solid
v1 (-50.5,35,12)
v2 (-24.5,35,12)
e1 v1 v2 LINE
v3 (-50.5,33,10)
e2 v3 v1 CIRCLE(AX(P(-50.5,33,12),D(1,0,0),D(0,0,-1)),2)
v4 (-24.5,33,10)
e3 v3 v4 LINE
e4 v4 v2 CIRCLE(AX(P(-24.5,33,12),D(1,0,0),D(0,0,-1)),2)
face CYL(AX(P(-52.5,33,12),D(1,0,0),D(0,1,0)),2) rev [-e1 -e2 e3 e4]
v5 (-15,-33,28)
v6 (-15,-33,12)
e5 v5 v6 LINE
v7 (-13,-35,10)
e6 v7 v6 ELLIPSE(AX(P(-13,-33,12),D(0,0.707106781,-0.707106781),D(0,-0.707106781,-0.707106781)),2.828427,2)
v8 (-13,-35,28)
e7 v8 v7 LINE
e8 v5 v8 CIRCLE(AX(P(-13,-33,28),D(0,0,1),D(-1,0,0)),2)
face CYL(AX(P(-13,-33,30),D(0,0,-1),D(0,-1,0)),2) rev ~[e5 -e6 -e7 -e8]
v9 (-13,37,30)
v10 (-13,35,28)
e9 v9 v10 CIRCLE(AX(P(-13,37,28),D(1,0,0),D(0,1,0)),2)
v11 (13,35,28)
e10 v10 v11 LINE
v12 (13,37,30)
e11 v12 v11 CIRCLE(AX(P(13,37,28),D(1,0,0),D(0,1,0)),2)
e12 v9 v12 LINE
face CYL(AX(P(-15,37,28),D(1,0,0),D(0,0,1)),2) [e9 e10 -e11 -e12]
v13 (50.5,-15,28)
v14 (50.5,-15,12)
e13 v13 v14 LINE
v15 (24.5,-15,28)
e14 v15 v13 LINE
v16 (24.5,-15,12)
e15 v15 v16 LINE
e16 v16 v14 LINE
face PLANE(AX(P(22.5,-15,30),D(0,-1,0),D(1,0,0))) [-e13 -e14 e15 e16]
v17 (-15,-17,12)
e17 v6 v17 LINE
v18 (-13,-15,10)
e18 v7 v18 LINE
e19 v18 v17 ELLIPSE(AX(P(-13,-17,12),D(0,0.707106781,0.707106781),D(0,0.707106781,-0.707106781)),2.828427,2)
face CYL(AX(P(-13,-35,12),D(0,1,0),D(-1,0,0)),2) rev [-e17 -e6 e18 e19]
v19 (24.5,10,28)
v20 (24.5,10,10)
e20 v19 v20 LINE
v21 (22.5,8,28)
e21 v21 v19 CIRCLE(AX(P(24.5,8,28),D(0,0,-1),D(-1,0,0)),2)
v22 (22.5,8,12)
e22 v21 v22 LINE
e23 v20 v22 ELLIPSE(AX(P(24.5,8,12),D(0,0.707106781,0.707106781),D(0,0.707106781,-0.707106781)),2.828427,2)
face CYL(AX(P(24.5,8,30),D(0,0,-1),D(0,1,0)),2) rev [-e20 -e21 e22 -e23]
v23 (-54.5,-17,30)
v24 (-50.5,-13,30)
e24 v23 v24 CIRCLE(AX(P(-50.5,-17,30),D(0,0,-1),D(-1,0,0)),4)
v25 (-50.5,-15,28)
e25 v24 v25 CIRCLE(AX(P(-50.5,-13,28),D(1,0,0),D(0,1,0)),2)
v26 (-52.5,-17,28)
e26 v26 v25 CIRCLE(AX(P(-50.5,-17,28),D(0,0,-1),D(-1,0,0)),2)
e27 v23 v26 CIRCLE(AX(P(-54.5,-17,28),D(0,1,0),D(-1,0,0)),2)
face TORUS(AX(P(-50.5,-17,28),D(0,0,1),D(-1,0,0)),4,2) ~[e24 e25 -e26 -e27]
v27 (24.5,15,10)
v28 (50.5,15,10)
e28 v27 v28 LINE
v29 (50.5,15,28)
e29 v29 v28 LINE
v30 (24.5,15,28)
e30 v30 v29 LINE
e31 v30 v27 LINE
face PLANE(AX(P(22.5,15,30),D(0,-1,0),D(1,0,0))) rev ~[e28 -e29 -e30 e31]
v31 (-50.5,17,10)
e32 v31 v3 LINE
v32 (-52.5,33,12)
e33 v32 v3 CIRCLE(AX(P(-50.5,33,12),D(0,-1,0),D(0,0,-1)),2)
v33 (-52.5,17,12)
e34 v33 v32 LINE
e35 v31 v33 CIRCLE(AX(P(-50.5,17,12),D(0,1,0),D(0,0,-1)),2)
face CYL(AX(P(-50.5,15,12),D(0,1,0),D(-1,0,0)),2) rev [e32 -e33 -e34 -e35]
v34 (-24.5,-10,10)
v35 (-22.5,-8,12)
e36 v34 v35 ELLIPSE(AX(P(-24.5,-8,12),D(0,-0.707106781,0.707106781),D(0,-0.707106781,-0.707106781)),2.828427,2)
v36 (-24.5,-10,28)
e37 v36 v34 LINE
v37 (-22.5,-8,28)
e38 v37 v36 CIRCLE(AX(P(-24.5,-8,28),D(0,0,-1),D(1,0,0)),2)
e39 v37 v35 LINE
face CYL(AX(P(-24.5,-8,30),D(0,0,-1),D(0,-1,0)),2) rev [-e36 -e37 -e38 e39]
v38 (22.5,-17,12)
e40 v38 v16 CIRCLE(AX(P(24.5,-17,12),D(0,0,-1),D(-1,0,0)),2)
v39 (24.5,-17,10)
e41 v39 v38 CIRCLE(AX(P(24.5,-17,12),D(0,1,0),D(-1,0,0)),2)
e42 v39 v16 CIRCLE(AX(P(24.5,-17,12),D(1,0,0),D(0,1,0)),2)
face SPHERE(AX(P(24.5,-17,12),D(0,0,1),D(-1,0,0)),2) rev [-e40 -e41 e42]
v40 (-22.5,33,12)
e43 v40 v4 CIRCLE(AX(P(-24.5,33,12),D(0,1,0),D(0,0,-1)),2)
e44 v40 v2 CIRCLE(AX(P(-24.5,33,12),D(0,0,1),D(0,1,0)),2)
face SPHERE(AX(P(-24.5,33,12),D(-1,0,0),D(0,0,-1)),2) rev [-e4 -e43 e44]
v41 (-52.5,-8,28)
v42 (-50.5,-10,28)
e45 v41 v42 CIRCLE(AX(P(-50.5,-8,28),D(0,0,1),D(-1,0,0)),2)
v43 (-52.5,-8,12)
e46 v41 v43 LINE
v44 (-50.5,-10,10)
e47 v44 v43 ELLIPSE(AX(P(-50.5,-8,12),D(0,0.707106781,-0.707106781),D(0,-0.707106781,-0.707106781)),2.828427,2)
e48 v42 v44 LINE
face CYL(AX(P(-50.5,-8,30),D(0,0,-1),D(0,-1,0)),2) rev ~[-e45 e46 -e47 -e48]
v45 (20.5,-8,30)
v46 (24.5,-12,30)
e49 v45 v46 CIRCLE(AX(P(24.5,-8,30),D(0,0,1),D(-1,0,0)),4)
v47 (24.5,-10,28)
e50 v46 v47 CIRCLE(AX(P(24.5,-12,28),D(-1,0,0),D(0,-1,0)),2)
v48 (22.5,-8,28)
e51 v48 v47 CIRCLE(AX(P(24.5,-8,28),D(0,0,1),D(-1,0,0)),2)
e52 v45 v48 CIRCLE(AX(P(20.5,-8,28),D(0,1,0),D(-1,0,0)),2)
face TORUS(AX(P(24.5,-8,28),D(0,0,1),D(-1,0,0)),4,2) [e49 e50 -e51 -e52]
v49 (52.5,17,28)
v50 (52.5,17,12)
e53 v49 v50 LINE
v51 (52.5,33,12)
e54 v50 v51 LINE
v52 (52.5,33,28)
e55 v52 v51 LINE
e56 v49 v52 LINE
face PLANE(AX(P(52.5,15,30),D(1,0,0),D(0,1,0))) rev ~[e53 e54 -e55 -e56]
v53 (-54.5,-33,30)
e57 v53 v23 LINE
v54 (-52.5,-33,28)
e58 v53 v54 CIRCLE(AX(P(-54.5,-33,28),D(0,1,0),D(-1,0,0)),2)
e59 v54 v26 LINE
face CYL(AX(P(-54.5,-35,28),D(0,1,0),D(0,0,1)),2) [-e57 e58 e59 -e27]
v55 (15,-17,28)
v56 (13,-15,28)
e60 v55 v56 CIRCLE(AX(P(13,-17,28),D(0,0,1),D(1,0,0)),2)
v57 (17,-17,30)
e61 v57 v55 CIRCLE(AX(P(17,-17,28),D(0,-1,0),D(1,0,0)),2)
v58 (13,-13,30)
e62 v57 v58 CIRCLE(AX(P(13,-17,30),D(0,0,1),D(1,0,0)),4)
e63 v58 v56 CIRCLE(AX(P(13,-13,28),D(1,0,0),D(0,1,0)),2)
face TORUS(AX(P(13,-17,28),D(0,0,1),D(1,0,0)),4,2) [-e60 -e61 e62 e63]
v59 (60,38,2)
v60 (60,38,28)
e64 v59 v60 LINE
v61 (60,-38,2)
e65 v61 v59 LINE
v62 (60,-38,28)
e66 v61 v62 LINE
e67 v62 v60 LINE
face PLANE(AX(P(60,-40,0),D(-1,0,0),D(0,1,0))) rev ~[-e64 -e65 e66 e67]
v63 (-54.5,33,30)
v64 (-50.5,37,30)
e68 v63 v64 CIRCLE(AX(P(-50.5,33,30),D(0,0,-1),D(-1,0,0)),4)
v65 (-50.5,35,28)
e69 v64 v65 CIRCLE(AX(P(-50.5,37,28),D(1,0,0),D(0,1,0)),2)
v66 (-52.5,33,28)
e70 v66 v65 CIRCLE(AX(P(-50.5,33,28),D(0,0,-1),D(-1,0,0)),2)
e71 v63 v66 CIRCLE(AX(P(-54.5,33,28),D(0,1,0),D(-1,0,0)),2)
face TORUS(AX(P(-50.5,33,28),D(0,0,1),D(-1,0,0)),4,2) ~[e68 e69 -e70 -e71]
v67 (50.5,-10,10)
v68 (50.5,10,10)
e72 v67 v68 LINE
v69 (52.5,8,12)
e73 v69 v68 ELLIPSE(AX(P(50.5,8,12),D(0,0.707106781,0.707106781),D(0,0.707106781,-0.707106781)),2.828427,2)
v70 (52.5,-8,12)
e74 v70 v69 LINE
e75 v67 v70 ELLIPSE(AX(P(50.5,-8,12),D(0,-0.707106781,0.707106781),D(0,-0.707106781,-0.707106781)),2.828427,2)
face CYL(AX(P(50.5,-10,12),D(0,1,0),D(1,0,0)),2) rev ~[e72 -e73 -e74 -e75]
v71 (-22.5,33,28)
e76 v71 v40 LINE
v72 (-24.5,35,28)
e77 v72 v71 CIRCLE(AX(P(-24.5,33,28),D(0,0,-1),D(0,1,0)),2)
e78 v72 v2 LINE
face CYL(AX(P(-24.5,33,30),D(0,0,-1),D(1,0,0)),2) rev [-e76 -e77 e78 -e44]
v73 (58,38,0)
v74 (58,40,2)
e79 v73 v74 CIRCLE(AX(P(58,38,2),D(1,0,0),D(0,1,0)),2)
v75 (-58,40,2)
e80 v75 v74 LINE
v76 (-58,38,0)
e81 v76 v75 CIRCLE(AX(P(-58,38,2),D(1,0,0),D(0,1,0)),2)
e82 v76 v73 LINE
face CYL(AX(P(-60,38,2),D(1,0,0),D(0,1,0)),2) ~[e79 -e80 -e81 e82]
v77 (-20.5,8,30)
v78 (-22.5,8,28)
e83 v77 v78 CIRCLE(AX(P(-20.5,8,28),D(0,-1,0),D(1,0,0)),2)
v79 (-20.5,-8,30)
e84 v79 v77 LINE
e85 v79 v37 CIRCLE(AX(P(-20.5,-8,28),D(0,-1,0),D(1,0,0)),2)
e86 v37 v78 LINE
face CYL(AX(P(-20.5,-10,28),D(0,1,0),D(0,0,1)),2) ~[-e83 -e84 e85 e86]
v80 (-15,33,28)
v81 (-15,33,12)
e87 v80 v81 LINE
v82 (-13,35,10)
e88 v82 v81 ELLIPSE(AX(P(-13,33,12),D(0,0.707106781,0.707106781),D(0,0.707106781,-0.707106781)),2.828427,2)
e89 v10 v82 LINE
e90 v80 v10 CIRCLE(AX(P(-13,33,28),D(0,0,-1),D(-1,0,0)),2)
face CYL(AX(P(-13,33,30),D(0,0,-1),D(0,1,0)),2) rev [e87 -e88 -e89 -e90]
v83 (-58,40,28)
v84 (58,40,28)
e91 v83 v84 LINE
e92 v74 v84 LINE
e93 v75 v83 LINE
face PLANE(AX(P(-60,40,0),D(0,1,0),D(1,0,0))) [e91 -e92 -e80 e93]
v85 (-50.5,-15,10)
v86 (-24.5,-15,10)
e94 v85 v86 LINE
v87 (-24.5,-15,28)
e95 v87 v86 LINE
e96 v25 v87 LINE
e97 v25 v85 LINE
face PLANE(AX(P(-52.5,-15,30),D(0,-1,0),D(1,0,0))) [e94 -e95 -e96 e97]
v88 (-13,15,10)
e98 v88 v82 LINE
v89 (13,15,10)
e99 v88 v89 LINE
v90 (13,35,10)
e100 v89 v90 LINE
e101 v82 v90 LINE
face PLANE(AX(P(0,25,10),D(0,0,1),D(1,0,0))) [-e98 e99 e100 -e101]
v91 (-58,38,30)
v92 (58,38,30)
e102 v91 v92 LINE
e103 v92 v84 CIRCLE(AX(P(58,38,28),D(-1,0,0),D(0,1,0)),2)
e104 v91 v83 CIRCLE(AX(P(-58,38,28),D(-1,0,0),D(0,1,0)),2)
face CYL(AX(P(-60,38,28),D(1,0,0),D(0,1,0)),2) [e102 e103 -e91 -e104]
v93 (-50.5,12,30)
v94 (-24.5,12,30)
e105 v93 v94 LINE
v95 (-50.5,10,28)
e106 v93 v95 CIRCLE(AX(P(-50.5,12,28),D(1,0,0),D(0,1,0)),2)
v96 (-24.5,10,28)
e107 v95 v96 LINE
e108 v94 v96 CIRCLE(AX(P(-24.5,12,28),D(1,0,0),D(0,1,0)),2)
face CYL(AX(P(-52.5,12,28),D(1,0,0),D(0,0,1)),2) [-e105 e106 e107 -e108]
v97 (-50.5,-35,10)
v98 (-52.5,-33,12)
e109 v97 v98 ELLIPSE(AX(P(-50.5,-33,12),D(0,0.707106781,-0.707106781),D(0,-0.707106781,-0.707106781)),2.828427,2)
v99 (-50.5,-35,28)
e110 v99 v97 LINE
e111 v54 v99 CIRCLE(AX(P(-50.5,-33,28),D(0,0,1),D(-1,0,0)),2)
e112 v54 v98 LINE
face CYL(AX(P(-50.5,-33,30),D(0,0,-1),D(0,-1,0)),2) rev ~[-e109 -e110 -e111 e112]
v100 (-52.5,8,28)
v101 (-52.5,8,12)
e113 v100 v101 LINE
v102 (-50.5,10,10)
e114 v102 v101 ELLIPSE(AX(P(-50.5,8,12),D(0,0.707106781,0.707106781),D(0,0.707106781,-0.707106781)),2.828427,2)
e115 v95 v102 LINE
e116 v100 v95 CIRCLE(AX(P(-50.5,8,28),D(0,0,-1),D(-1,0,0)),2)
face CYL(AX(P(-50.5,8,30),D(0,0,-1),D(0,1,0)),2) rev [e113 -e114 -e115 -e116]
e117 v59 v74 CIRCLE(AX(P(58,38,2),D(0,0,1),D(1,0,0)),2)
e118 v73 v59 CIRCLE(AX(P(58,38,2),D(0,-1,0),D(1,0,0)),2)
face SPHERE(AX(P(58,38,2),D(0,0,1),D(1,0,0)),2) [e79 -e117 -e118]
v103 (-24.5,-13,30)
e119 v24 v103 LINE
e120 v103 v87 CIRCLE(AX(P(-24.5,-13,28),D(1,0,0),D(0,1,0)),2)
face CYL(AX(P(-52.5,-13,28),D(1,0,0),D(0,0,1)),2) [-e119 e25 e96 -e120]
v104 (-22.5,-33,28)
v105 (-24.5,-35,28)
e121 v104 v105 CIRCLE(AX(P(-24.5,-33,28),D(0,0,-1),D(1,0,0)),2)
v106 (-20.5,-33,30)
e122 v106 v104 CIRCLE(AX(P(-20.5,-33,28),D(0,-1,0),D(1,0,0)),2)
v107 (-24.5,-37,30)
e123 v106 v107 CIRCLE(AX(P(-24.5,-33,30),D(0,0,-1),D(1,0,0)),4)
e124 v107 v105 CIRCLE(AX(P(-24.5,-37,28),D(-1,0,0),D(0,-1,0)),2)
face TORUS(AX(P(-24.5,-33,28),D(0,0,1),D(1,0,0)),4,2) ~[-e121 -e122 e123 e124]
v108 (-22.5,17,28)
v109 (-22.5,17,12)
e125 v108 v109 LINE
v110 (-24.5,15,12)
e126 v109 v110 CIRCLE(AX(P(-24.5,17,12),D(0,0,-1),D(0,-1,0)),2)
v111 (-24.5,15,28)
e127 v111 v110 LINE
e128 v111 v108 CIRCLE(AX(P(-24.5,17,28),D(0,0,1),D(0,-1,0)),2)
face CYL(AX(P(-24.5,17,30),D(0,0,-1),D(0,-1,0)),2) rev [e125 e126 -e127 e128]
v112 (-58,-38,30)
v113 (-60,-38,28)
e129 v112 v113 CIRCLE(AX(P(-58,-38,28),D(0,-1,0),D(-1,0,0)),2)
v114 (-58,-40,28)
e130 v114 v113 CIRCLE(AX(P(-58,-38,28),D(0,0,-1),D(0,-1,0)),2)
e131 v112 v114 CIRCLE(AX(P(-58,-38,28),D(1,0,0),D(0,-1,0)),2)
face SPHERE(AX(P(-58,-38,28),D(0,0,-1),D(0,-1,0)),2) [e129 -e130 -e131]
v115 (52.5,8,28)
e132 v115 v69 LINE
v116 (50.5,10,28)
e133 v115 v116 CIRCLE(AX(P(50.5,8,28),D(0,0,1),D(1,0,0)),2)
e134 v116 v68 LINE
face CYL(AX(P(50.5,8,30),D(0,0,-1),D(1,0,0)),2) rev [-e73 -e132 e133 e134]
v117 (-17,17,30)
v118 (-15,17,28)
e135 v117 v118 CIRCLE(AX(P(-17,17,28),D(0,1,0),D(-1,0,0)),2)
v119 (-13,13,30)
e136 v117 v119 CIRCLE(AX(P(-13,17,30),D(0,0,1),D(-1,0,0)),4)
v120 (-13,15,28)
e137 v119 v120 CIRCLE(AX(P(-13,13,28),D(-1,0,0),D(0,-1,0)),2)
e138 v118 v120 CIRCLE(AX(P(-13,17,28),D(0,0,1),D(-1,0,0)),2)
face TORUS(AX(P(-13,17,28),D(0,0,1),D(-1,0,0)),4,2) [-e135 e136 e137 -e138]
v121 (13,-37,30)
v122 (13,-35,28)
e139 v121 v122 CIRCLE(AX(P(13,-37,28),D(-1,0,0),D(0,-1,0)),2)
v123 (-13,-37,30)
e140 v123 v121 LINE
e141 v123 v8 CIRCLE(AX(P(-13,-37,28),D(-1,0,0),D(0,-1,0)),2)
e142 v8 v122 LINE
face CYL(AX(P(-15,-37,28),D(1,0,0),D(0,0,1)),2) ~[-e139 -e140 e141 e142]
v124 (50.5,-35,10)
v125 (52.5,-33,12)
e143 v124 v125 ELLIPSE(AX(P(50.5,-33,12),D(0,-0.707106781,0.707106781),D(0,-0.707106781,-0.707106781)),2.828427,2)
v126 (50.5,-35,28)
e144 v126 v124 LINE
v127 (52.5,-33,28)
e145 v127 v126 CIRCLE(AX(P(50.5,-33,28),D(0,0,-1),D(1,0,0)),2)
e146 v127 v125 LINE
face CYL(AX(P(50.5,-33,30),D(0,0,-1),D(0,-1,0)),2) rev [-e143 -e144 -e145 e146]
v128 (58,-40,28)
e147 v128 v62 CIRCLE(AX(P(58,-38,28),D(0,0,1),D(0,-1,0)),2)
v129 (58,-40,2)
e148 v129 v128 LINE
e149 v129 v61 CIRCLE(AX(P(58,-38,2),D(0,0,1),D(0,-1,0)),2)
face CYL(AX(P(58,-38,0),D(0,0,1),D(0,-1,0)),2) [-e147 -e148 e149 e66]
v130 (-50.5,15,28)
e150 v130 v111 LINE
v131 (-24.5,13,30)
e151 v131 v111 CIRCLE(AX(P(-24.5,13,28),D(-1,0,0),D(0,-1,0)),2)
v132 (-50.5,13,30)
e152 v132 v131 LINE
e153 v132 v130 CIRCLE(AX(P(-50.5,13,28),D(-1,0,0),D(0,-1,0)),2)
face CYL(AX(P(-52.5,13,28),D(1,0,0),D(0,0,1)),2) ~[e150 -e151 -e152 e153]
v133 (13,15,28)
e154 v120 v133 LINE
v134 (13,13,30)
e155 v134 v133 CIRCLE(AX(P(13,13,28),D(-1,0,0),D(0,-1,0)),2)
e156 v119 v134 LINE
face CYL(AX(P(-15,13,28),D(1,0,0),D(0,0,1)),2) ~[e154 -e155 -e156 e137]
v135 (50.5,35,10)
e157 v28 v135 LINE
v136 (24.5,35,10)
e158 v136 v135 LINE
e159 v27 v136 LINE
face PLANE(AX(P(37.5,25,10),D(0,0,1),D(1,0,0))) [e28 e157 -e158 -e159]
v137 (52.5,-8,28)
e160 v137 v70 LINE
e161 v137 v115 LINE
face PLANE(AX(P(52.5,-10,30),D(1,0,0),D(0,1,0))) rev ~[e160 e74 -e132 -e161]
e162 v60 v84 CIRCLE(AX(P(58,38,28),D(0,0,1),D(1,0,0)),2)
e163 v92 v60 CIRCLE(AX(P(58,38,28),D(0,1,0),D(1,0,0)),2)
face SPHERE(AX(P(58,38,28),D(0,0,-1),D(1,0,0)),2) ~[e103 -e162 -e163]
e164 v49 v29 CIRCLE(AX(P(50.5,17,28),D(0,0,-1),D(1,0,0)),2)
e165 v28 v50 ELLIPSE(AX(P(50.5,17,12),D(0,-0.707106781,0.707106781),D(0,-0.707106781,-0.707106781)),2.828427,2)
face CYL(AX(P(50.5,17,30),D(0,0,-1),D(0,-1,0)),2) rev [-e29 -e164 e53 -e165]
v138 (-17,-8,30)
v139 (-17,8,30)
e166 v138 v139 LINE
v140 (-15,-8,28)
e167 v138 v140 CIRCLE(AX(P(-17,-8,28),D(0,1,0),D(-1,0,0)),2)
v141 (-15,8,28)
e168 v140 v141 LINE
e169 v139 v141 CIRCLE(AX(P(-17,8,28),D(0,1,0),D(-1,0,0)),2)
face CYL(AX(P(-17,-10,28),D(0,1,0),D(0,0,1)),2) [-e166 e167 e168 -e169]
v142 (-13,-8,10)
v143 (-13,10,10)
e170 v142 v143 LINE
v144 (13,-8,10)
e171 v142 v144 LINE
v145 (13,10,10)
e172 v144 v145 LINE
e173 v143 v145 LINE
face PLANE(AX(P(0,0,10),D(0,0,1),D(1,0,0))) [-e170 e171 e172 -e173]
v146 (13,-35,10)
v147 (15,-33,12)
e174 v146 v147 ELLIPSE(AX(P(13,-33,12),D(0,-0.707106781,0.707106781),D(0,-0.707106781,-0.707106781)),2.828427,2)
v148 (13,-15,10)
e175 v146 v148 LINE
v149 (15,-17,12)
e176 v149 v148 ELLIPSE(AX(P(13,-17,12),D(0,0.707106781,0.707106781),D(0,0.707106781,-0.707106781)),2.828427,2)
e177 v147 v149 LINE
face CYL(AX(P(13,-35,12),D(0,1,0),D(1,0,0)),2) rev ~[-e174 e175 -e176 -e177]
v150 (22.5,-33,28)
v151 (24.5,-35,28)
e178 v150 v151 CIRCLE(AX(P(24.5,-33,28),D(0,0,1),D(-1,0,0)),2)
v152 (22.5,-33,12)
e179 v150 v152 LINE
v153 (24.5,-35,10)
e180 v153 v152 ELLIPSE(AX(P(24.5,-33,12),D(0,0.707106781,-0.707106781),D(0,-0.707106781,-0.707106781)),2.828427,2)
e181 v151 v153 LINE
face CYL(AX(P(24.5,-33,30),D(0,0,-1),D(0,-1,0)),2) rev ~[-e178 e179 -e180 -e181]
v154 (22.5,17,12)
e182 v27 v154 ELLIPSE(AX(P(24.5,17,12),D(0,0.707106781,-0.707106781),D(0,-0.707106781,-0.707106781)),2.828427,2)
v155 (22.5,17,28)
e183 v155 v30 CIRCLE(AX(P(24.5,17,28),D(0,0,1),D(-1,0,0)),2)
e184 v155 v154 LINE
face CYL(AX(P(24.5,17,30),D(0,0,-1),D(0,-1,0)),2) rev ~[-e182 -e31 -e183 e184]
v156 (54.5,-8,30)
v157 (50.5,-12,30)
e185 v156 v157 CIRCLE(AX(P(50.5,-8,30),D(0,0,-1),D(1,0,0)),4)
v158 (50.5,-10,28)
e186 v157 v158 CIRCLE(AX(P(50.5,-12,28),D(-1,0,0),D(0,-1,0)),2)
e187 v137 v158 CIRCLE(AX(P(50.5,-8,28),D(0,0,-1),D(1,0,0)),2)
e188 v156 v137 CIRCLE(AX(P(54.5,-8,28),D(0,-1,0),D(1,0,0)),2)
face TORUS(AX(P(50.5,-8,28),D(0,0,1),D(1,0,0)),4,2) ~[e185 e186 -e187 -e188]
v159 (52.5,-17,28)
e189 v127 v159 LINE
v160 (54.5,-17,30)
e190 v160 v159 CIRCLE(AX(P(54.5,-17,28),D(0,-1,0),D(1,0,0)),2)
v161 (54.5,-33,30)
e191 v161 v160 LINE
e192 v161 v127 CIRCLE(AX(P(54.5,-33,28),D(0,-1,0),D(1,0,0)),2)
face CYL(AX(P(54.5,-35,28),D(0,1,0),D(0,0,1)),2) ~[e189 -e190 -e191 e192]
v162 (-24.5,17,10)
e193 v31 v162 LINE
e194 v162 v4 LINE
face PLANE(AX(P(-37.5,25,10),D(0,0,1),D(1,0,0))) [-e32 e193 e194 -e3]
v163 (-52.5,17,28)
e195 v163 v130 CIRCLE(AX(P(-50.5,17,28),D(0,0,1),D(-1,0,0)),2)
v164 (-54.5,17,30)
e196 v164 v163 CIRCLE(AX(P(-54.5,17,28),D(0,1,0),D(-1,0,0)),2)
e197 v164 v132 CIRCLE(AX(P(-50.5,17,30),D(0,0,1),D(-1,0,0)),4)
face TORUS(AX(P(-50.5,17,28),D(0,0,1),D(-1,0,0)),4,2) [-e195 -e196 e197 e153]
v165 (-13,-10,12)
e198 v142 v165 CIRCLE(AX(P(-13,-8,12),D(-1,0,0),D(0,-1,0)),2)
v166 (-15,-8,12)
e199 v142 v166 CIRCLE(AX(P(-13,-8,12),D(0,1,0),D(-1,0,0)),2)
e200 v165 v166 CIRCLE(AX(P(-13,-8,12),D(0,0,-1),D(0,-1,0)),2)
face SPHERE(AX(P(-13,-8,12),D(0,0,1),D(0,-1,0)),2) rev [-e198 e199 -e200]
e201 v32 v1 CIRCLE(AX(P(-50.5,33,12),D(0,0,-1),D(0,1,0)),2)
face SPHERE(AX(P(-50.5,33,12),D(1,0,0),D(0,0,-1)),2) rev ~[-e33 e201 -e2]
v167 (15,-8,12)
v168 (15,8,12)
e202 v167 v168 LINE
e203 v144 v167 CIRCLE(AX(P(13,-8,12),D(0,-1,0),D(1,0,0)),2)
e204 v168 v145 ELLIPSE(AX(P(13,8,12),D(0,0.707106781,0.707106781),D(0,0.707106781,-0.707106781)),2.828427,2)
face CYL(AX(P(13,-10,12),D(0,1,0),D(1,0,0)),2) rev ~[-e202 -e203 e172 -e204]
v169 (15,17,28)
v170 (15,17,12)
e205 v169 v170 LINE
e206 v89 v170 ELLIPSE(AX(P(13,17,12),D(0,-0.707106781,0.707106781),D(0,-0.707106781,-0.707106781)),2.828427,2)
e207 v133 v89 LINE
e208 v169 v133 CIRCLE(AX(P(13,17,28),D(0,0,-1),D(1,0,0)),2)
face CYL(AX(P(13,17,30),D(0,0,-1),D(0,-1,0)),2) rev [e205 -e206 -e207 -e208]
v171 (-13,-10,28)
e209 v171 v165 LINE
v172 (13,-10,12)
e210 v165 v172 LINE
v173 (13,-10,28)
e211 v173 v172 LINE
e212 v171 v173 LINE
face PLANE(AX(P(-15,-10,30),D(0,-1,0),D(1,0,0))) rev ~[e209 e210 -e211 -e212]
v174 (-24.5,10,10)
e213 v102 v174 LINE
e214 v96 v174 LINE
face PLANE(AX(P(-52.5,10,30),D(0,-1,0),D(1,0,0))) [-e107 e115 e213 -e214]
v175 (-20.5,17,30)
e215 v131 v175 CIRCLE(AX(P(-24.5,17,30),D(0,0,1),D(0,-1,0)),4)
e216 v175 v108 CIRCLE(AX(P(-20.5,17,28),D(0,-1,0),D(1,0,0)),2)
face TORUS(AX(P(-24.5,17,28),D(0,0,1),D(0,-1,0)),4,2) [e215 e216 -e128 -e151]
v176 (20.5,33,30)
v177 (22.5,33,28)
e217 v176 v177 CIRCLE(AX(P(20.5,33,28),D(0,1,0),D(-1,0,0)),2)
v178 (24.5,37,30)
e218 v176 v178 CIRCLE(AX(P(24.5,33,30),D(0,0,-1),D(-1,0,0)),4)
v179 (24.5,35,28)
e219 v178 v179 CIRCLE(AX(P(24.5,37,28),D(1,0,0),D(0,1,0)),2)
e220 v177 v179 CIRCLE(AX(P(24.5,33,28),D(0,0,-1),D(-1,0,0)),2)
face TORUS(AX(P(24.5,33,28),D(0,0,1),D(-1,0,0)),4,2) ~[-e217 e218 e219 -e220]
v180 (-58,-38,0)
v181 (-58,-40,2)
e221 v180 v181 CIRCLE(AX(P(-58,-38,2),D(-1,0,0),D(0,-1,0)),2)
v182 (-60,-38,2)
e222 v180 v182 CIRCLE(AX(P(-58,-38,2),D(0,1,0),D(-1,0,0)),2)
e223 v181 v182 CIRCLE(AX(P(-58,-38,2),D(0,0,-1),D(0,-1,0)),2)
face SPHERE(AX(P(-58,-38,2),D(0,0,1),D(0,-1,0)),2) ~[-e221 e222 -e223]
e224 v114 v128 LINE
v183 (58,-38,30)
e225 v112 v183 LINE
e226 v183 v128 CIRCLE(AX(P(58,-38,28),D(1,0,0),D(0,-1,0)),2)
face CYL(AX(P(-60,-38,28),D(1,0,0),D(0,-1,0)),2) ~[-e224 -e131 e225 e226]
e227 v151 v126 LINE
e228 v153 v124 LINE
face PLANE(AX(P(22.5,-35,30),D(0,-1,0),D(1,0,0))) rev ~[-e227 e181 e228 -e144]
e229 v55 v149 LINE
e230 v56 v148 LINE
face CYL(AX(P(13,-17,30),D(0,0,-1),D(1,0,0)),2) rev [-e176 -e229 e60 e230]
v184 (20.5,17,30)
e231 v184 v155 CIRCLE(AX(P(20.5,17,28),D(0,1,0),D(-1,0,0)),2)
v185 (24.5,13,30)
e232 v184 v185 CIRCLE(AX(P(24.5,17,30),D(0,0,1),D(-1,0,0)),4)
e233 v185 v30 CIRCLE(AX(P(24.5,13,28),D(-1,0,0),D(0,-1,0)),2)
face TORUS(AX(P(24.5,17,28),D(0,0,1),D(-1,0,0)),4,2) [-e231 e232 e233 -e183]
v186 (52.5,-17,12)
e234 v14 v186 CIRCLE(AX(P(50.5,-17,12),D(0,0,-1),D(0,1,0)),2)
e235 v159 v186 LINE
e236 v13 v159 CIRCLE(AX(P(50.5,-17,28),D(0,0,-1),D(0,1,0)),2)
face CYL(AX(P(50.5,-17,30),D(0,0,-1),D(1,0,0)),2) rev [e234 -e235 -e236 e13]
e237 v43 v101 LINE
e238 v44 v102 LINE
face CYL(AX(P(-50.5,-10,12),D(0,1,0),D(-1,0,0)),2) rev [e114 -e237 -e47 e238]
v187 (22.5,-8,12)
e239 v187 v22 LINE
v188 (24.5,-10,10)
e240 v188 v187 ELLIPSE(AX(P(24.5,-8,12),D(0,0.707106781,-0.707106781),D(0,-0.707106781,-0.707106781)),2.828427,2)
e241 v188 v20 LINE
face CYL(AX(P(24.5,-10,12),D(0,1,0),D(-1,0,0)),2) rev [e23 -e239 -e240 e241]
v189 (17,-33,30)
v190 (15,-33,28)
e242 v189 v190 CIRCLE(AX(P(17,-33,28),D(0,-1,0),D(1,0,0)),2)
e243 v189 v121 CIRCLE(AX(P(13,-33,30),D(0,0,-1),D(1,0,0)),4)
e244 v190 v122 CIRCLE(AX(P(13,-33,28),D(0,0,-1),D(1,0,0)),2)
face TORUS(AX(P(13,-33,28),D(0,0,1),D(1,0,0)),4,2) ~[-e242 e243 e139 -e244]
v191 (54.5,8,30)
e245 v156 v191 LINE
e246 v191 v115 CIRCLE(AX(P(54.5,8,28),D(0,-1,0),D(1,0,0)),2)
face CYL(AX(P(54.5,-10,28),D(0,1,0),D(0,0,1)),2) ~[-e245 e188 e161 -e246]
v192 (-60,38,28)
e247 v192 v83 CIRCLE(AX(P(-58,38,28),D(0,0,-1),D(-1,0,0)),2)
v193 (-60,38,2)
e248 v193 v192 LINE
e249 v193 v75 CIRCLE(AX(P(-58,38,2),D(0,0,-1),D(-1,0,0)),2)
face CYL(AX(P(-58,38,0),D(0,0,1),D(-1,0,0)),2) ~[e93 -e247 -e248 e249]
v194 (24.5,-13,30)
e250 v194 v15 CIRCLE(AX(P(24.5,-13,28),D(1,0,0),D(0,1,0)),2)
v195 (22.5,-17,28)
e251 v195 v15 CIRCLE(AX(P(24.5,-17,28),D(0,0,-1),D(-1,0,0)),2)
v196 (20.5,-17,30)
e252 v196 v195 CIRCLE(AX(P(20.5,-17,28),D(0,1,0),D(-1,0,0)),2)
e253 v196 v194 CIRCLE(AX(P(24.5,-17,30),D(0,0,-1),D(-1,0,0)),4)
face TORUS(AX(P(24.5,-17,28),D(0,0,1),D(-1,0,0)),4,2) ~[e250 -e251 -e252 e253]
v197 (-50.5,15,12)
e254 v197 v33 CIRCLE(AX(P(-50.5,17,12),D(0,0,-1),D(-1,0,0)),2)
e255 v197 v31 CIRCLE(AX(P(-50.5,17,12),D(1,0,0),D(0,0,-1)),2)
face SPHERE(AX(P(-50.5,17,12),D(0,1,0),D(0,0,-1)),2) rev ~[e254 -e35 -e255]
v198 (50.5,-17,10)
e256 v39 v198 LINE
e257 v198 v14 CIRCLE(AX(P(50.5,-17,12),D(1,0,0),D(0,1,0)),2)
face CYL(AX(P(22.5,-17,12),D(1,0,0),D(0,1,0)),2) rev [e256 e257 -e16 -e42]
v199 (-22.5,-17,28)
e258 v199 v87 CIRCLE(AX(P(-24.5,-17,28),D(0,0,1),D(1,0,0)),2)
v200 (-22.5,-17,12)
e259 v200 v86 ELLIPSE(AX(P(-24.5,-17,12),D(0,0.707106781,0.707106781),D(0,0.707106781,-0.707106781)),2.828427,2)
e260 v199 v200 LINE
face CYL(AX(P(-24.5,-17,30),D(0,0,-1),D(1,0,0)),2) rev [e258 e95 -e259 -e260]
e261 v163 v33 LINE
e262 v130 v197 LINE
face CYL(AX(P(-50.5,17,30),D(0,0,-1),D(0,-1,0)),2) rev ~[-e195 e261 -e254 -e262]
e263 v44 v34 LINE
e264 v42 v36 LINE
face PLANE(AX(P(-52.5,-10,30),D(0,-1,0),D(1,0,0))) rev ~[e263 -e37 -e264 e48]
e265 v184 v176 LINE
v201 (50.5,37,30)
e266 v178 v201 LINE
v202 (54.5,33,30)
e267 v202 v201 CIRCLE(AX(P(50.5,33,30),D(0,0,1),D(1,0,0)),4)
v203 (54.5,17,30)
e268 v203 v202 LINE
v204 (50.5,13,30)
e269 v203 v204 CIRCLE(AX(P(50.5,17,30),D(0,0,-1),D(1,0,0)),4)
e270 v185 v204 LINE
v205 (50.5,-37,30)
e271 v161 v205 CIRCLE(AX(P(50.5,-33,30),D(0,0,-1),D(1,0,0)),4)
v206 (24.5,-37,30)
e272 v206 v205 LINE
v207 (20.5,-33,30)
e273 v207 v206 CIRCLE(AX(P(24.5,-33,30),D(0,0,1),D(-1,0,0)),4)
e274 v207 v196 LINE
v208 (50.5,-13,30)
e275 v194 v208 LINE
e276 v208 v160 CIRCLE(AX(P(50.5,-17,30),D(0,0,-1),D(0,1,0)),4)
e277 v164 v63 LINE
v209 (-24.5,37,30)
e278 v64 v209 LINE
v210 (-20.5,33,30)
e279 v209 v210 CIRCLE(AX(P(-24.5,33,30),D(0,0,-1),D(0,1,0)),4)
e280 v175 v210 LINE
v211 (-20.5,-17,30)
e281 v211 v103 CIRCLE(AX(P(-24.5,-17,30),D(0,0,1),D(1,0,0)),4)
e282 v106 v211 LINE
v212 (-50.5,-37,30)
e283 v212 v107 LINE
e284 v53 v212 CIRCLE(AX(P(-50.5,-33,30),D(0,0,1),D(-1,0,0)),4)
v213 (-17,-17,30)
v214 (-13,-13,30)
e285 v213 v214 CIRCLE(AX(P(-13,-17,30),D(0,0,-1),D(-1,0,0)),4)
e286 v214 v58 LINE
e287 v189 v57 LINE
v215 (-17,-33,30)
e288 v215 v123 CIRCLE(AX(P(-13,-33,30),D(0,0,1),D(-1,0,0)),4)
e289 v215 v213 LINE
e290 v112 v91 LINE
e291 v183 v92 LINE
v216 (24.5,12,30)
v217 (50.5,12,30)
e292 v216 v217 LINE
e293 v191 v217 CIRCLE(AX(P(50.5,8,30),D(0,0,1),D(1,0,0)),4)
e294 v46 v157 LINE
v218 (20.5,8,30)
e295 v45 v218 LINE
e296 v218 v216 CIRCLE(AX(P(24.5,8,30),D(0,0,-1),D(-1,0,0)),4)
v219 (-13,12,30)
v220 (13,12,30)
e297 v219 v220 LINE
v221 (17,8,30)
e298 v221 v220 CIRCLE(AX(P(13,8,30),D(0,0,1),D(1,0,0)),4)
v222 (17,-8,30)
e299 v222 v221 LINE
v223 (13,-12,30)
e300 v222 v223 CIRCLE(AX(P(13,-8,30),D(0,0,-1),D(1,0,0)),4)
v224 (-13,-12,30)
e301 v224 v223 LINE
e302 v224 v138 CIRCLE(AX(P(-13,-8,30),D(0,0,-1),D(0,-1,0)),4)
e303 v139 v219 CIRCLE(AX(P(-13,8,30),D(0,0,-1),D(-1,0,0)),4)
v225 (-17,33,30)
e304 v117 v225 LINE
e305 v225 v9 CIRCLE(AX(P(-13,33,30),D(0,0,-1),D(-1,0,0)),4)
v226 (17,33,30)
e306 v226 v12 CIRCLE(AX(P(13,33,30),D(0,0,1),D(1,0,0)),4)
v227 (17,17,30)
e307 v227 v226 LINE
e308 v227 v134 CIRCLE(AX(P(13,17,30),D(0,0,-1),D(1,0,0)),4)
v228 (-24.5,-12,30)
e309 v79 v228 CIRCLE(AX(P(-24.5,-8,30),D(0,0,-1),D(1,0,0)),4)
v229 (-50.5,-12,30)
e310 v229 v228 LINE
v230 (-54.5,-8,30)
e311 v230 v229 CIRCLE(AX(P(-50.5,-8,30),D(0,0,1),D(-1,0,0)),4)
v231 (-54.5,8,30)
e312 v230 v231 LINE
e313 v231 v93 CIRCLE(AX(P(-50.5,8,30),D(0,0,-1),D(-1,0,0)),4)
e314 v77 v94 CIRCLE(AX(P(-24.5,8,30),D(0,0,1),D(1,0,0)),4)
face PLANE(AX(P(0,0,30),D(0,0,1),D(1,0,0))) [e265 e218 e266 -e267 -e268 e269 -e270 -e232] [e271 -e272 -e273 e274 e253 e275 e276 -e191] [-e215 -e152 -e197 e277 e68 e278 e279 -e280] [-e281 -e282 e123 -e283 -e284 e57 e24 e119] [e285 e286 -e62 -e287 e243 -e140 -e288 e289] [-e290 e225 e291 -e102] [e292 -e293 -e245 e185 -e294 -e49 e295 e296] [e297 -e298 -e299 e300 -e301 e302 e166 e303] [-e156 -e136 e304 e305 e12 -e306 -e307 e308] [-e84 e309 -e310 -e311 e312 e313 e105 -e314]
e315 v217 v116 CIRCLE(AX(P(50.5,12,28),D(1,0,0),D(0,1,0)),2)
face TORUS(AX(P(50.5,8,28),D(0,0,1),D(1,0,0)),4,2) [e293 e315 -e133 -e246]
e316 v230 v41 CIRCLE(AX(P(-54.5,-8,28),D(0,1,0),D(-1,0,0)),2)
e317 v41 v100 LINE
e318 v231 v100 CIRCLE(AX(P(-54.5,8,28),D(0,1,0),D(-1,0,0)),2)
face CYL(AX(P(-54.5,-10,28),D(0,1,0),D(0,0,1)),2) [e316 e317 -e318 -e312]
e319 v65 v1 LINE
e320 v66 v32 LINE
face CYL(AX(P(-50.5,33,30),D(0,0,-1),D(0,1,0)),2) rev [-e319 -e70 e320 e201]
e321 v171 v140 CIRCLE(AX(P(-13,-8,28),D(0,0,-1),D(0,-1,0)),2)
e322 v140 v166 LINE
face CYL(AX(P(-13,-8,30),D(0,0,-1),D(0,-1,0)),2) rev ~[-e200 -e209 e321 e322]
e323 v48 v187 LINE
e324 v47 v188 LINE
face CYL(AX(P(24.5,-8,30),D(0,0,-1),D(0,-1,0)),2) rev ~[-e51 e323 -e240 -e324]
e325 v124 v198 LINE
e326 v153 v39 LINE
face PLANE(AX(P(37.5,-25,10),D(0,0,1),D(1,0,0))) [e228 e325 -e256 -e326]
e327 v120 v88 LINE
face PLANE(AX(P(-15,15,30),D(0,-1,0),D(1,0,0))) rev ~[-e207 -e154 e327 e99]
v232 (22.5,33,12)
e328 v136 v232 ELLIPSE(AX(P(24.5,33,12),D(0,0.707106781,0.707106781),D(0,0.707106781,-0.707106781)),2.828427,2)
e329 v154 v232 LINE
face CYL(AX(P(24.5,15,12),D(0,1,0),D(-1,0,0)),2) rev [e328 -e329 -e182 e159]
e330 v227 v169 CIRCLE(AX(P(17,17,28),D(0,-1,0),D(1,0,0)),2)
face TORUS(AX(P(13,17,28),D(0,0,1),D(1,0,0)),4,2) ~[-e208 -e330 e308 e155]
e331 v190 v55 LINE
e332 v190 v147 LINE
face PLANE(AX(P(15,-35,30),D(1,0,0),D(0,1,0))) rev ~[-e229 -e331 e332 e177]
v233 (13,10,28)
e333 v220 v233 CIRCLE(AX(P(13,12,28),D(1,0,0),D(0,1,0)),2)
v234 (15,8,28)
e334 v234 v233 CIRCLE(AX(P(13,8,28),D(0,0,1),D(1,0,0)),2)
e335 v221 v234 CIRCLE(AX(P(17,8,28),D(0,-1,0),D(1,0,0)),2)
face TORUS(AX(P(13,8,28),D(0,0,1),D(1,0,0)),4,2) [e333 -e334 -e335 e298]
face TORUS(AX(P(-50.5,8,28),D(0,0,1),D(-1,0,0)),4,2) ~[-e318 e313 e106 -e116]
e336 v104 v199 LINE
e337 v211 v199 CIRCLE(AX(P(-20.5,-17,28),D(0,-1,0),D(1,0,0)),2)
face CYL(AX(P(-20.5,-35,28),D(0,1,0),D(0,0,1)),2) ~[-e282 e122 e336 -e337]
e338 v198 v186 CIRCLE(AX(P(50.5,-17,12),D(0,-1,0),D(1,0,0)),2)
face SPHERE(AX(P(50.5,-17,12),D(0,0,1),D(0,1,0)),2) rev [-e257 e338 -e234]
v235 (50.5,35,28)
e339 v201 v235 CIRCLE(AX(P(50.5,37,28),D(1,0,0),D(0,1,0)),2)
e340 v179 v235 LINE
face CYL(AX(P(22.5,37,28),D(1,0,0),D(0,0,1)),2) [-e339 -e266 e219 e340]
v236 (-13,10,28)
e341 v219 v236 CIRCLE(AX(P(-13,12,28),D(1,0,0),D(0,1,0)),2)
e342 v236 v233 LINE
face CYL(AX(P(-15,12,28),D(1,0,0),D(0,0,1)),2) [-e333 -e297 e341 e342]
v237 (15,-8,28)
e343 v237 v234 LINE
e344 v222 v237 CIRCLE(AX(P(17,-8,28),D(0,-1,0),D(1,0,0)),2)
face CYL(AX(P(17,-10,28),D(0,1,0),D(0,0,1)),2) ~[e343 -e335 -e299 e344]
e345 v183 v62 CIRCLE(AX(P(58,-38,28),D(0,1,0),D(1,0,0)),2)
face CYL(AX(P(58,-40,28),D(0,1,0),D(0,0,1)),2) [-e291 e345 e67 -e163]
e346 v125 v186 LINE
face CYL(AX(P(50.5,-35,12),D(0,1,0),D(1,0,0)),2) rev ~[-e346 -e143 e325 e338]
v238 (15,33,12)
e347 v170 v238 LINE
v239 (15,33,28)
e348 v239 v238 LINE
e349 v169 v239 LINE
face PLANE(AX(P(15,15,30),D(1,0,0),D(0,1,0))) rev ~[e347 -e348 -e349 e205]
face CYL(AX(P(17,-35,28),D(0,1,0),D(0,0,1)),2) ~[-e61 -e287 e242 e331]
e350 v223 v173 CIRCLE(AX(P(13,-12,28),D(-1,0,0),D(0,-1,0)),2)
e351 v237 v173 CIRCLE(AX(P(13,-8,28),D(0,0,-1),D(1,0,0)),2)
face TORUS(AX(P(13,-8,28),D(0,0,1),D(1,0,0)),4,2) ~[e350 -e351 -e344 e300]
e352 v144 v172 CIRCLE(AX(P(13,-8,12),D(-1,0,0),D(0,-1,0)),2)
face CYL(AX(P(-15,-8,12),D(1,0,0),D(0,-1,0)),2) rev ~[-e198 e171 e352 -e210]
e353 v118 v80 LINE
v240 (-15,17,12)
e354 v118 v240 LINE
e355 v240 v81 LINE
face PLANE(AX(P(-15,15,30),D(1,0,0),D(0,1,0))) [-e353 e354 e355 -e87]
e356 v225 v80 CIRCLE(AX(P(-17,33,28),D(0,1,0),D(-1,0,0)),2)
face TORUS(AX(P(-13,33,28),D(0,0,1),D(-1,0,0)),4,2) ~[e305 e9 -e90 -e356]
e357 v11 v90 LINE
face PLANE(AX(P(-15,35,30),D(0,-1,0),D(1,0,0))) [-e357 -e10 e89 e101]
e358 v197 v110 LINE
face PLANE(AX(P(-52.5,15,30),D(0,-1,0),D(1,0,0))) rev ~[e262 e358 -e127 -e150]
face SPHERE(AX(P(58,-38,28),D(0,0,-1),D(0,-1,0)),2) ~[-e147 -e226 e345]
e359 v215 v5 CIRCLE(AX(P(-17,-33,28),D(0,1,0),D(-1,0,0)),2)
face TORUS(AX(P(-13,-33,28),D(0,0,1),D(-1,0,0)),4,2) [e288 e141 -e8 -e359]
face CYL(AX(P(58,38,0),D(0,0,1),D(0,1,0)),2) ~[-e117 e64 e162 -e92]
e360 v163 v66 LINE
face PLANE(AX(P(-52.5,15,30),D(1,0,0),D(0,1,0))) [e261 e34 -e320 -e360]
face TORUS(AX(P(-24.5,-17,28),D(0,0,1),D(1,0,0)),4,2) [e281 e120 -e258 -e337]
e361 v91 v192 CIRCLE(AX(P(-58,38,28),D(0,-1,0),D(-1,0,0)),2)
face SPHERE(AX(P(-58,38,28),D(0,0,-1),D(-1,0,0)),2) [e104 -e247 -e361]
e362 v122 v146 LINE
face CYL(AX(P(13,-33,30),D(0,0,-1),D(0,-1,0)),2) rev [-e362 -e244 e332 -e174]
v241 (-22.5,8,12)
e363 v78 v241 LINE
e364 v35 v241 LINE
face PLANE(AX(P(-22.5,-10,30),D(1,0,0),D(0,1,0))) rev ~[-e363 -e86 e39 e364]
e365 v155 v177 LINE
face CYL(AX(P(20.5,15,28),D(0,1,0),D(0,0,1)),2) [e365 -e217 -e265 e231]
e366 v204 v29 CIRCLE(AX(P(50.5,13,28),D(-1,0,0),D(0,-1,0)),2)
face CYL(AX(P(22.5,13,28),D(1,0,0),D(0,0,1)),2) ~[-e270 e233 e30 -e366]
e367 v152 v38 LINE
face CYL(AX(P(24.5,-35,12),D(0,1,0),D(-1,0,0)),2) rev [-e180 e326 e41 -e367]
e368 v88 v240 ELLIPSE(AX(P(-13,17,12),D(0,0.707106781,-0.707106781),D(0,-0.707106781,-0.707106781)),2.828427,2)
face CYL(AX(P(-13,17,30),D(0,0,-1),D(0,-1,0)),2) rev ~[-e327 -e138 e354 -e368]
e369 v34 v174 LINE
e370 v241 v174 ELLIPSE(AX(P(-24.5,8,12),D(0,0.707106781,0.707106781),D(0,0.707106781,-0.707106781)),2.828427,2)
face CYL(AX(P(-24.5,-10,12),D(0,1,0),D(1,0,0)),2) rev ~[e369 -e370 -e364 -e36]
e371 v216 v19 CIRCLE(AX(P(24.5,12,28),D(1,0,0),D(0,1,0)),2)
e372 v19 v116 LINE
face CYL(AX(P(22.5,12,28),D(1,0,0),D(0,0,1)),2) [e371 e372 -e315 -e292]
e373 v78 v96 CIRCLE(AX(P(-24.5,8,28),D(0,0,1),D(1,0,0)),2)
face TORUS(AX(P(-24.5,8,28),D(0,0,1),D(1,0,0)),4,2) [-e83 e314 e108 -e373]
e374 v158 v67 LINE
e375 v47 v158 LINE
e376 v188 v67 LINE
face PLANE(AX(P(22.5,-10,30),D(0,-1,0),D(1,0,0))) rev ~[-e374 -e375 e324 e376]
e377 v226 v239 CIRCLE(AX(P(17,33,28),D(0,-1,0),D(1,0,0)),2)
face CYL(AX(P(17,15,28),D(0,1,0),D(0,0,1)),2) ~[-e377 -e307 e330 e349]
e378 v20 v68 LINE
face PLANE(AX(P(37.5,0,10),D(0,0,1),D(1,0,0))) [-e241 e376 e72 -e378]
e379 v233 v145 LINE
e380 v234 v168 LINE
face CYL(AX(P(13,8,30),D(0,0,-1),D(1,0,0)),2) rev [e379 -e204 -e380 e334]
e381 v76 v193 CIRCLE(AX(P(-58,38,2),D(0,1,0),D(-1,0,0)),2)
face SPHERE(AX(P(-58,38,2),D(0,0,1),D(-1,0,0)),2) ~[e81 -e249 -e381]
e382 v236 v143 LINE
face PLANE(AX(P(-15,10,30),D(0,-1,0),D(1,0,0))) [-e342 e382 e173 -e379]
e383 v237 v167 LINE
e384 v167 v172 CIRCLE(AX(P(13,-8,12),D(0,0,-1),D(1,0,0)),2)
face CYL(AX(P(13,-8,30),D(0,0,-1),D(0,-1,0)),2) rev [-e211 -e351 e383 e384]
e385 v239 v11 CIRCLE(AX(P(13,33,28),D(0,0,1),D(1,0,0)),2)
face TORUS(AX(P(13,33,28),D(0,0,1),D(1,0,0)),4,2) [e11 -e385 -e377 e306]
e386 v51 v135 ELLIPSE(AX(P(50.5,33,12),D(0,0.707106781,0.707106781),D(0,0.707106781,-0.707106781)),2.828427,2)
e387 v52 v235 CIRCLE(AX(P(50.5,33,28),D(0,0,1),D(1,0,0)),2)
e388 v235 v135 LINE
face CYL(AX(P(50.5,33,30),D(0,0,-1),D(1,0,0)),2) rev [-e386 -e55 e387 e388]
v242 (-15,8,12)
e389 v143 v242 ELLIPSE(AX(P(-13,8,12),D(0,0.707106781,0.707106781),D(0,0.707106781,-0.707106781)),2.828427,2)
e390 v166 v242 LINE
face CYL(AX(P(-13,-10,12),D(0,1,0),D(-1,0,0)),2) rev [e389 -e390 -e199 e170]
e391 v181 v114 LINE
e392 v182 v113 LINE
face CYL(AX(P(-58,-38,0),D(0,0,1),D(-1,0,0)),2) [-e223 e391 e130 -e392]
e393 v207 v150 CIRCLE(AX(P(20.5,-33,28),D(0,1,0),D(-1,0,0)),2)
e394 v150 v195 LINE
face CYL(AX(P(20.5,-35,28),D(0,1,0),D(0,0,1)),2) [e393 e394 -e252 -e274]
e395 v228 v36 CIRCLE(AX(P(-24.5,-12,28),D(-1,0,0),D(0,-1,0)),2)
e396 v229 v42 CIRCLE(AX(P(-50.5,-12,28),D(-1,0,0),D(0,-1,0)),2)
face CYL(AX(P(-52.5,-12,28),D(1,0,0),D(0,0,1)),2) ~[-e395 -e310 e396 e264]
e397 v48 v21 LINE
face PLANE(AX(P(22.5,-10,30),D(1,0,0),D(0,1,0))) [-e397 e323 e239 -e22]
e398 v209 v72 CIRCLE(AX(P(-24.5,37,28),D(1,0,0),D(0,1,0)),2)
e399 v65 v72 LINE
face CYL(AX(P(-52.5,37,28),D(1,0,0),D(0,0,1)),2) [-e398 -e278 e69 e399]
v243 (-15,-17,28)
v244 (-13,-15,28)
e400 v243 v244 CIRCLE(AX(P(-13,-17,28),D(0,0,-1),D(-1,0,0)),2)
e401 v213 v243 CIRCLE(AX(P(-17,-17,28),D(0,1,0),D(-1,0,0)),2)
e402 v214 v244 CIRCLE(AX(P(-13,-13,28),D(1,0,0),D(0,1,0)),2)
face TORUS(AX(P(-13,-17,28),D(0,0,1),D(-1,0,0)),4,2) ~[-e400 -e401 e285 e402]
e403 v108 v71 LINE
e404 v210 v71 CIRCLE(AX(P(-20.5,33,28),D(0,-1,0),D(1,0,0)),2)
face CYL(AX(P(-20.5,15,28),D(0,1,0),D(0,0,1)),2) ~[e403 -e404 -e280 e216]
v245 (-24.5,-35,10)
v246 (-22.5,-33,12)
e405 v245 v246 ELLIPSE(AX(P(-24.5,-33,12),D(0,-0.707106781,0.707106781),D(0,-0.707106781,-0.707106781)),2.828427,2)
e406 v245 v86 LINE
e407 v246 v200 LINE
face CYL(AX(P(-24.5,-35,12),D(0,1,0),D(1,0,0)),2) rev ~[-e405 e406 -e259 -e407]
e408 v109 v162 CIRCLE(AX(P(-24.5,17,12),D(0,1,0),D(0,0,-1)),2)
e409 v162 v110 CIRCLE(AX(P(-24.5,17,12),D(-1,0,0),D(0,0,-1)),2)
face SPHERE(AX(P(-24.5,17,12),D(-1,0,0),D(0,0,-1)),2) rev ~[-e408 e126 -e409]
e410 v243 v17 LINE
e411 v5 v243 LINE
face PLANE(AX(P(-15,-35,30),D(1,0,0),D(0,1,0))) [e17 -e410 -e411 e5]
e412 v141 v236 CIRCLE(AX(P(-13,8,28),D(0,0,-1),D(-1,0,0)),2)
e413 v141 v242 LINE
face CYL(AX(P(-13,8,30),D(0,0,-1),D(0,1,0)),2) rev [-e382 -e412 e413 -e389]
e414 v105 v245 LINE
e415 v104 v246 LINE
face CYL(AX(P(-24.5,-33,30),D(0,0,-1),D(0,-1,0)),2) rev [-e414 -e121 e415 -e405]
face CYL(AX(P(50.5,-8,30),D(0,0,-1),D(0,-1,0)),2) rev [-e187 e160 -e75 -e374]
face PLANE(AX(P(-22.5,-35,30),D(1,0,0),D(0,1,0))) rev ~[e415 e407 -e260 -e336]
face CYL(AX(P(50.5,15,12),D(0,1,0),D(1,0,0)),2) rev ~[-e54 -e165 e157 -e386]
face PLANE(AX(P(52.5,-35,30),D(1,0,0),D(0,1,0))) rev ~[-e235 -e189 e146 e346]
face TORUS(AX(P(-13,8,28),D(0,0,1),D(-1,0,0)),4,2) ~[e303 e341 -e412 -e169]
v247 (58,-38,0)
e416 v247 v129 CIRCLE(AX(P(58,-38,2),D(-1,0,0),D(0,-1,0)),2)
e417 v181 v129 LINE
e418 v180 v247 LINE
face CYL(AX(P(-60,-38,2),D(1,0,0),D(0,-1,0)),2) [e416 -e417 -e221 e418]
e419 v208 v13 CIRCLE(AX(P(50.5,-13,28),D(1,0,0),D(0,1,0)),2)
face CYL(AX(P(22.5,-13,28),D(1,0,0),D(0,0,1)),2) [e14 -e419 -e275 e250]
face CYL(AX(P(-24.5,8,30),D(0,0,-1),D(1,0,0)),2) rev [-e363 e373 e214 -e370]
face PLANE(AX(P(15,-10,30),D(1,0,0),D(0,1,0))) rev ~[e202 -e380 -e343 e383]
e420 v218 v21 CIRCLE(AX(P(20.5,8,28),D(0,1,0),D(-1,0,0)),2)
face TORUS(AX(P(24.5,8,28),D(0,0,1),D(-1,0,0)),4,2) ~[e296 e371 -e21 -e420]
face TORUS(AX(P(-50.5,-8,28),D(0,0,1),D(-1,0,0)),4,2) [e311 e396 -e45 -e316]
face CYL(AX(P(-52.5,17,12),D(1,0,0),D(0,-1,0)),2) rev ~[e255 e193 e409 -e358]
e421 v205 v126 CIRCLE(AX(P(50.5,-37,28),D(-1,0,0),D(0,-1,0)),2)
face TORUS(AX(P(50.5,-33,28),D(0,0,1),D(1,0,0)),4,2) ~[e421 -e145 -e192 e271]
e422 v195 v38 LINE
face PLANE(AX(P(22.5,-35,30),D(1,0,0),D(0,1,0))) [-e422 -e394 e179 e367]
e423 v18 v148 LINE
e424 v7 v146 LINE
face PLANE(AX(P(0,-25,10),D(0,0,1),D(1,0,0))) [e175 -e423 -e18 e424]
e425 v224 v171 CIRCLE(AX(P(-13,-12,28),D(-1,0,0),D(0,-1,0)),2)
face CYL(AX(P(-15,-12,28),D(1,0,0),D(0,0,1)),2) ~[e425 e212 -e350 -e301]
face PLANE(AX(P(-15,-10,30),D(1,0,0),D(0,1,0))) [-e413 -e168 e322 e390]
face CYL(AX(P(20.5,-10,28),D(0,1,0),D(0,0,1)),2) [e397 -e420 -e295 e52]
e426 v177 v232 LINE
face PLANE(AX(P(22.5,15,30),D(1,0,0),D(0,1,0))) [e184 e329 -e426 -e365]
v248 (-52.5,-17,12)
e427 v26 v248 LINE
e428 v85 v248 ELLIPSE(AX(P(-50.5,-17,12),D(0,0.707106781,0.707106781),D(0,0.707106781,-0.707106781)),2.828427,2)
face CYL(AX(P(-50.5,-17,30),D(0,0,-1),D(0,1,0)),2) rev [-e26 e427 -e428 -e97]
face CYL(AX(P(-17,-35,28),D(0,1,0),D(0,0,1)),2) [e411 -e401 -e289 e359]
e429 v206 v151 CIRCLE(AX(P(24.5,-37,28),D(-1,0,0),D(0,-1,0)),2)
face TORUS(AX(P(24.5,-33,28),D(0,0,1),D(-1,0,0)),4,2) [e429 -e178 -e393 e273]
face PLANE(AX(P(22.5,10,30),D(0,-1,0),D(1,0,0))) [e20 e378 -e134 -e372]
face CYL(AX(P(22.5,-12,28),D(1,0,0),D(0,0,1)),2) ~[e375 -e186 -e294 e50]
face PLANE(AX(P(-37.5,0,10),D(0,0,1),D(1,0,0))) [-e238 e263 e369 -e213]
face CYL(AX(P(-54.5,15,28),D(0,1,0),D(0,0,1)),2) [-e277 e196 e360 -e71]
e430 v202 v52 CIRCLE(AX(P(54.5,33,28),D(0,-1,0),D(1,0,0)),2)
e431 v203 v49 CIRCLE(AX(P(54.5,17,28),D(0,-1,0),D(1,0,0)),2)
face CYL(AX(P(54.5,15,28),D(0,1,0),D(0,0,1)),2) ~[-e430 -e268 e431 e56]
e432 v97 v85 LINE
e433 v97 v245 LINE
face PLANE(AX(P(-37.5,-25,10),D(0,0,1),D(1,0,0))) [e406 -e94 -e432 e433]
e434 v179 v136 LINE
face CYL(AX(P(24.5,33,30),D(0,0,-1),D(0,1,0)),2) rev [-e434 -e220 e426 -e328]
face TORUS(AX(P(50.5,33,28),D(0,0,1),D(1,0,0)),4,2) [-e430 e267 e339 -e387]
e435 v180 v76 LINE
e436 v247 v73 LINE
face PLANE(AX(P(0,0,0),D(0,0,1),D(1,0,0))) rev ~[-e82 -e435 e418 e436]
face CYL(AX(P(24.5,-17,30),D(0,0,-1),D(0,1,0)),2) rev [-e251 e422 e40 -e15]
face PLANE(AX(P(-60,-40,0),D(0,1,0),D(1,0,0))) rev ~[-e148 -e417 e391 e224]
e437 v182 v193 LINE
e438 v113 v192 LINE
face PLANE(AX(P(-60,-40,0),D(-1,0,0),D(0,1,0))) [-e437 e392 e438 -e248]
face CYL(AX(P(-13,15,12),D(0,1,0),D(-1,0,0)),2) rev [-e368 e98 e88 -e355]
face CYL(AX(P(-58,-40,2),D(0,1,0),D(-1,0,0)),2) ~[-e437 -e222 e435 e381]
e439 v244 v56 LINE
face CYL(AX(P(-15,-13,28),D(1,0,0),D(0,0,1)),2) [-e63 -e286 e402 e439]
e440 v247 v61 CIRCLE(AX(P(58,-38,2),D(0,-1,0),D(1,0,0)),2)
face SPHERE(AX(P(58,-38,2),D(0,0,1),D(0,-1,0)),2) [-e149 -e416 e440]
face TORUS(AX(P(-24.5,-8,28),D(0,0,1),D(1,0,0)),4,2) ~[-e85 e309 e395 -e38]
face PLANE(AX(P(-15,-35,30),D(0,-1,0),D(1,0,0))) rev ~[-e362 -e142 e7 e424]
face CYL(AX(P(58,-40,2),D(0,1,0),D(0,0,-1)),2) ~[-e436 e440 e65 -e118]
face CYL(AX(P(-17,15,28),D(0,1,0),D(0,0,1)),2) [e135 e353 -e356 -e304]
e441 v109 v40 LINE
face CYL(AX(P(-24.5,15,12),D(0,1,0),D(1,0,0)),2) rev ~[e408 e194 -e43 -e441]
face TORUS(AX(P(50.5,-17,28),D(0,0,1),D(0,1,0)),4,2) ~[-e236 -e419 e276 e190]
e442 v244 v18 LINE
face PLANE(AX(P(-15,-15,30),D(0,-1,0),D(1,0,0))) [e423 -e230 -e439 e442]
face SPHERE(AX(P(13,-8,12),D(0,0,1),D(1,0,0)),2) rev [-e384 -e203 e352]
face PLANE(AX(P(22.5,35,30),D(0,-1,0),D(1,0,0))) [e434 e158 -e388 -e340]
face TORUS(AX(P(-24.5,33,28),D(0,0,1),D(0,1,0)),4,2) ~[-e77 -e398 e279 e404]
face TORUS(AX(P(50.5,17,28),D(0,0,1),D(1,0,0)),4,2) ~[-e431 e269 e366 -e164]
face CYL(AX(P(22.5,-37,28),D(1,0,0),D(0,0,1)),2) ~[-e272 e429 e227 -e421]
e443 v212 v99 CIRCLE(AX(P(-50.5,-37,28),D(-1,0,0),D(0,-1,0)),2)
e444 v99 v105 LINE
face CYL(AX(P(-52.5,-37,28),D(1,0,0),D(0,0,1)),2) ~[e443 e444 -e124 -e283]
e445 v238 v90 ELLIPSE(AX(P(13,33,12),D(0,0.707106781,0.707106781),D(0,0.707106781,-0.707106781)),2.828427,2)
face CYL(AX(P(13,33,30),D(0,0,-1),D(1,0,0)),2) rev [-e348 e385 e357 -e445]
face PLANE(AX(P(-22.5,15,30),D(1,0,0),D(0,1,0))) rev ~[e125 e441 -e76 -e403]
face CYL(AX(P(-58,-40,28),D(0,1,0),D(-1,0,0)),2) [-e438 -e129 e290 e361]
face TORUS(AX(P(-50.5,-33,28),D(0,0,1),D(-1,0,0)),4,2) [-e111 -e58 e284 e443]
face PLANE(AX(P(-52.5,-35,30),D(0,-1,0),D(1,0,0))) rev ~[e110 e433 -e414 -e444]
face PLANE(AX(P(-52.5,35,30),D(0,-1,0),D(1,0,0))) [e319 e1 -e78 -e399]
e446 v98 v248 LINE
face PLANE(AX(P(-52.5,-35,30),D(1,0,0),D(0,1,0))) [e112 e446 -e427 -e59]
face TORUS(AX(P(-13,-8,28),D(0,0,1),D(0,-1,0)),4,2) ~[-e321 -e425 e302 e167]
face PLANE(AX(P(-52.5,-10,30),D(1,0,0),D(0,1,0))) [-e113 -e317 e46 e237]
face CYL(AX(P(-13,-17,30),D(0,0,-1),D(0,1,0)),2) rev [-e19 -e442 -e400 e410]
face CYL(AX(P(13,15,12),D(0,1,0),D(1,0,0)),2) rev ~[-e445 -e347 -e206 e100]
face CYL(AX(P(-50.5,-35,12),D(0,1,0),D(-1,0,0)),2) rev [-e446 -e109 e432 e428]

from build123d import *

# Parameters (mm, degrees)
F0_W     = 120
F0_H     = 80
F1_DEPTH = 30
F2_W     = 30
F2_H     = 20
F3_DEPTH = 20
F4_R     = 2


with BuildPart() as f1:
    # F0 (on Top) → F1 (new body)
    with BuildSketch(Plane.XY):
        Rectangle(F0_W, F0_H)
    extrude(amount=F1_DEPTH)

    # F2 (on face) → F3 (cut)
    with BuildSketch(Plane.XY.offset(30)):
        with Locations((-37.5, 25)):
            Rectangle(F2_W, F2_H)
        with Locations((0, 25)):
            Rectangle(F2_W, F2_H)
        with Locations((37.5, 25)):
            Rectangle(F2_W, F2_H)
        with Locations((37.5, 0)):
            Rectangle(F2_W, F2_H)
        Rectangle(F2_W, F2_H)
        with Locations((-37.5, 0)):
            Rectangle(F2_W, F2_H)
        with Locations((-37.5, -25)):
            Rectangle(F2_W, F2_H)
        with Locations((0, -25)):
            Rectangle(F2_W, F2_H)
        with Locations((37.5, -25)):
            Rectangle(F2_W, F2_H)
    extrude(amount=-F3_DEPTH, mode=Mode.SUBTRACT)

    # F4
    f4_edges = [f1.edges().sort_by_distance(p)[0] for p in [
        (-37.5, 35, 10),
        (-52.5, 25, 10),
        (-37.5, 15, 10),
        (-22.5, 25, 10),
        (-52.5, 35, 20),
        (-52.5, 15, 20),
        (-52.5, 25, 30),
        (-22.5, 35, 20),
        (-37.5, 35, 30),
        (-22.5, 15, 20),
        (-37.5, 15, 30),
        (-22.5, 25, 30),
        (-15, 35, 20),
        (-15, 15, 20),
        (-15, 25, 30),
        (-15, 25, 10),
        (15, 15, 20),
        (15, 35, 20),
        (15, 25, 30),
        (15, 25, 10),
        (22.5, 35, 20),
        (22.5, 15, 20),
        (22.5, 25, 30),
        (22.5, 25, 10),
        (52.5, 15, 20),
        (52.5, 35, 20),
        (52.5, 25, 30),
        (52.5, 25, 10),
        (-22.5, -10, 20),
        (-22.5, 10, 20),
        (-22.5, 0, 30),
        (-22.5, 0, 10),
        (15, -35, 20),
        (15, -15, 20),
        (15, -25, 30),
        (15, -25, 10),
        (15, -10, 20),
        (15, 10, 20),
        (15, 0, 30),
        (15, 0, 10),
        (-15, -10, 20),
        (0, -10, 30),
        (0, -10, 10),
        (-15, 10, 20),
        (-15, 0, 30),
        (-15, 0, 10),
        (-52.5, 10, 20),
        (-52.5, -10, 20),
        (-52.5, 0, 30),
        (-52.5, 0, 10),
        (-52.5, -15, 20),
        (-52.5, -35, 20),
        (-52.5, -25, 30),
        (-52.5, -25, 10),
        (-15, -15, 20),
        (-15, -35, 20),
        (-15, -25, 30),
        (-15, -25, 10),
        (22.5, -15, 20),
        (22.5, -35, 20),
        (22.5, -25, 30),
        (22.5, -25, 10),
        (22.5, 10, 20),
        (22.5, -10, 20),
        (22.5, 0, 30),
        (22.5, 0, 10),
        (52.5, -15, 20),
        (37.5, -15, 30),
        (37.5, -15, 10),
        (52.5, -35, 20),
        (52.5, -25, 30),
        (52.5, -25, 10),
        (52.5, -10, 20),
        (52.5, 10, 20),
        (52.5, 0, 30),
        (52.5, 0, 10),
        (-22.5, -35, 20),
        (-22.5, -15, 20),
        (-22.5, -25, 30),
        (-22.5, -25, 10),
        (-60, 40, 15),
        (-60, -40, 15),
        (60, -40, 15),
        (0, -40, 0),
        (0, -40, 30),
        (60, 40, 15),
        (60, 0, 0),
        (60, 0, 30),
        (-60, 0, 0),
        (-60, 0, 30),
        (0, 40, 0),
        (0, 40, 30),
        (-37.5, -15, 30),
        (-37.5, -35, 30),
        (0, -15, 30),
        (0, -35, 30),
        (37.5, -35, 30),
        (-37.5, 10, 30),
        (-37.5, -10, 30),
        (0, 10, 30),
        (37.5, -10, 30),
        (37.5, 10, 30),
        (0, 35, 30),
        (0, 15, 30),
        (37.5, 35, 30),
        (37.5, 15, 30),
    ]]
    fillet(f4_edges, radius=F4_R)


solid = f1.part
